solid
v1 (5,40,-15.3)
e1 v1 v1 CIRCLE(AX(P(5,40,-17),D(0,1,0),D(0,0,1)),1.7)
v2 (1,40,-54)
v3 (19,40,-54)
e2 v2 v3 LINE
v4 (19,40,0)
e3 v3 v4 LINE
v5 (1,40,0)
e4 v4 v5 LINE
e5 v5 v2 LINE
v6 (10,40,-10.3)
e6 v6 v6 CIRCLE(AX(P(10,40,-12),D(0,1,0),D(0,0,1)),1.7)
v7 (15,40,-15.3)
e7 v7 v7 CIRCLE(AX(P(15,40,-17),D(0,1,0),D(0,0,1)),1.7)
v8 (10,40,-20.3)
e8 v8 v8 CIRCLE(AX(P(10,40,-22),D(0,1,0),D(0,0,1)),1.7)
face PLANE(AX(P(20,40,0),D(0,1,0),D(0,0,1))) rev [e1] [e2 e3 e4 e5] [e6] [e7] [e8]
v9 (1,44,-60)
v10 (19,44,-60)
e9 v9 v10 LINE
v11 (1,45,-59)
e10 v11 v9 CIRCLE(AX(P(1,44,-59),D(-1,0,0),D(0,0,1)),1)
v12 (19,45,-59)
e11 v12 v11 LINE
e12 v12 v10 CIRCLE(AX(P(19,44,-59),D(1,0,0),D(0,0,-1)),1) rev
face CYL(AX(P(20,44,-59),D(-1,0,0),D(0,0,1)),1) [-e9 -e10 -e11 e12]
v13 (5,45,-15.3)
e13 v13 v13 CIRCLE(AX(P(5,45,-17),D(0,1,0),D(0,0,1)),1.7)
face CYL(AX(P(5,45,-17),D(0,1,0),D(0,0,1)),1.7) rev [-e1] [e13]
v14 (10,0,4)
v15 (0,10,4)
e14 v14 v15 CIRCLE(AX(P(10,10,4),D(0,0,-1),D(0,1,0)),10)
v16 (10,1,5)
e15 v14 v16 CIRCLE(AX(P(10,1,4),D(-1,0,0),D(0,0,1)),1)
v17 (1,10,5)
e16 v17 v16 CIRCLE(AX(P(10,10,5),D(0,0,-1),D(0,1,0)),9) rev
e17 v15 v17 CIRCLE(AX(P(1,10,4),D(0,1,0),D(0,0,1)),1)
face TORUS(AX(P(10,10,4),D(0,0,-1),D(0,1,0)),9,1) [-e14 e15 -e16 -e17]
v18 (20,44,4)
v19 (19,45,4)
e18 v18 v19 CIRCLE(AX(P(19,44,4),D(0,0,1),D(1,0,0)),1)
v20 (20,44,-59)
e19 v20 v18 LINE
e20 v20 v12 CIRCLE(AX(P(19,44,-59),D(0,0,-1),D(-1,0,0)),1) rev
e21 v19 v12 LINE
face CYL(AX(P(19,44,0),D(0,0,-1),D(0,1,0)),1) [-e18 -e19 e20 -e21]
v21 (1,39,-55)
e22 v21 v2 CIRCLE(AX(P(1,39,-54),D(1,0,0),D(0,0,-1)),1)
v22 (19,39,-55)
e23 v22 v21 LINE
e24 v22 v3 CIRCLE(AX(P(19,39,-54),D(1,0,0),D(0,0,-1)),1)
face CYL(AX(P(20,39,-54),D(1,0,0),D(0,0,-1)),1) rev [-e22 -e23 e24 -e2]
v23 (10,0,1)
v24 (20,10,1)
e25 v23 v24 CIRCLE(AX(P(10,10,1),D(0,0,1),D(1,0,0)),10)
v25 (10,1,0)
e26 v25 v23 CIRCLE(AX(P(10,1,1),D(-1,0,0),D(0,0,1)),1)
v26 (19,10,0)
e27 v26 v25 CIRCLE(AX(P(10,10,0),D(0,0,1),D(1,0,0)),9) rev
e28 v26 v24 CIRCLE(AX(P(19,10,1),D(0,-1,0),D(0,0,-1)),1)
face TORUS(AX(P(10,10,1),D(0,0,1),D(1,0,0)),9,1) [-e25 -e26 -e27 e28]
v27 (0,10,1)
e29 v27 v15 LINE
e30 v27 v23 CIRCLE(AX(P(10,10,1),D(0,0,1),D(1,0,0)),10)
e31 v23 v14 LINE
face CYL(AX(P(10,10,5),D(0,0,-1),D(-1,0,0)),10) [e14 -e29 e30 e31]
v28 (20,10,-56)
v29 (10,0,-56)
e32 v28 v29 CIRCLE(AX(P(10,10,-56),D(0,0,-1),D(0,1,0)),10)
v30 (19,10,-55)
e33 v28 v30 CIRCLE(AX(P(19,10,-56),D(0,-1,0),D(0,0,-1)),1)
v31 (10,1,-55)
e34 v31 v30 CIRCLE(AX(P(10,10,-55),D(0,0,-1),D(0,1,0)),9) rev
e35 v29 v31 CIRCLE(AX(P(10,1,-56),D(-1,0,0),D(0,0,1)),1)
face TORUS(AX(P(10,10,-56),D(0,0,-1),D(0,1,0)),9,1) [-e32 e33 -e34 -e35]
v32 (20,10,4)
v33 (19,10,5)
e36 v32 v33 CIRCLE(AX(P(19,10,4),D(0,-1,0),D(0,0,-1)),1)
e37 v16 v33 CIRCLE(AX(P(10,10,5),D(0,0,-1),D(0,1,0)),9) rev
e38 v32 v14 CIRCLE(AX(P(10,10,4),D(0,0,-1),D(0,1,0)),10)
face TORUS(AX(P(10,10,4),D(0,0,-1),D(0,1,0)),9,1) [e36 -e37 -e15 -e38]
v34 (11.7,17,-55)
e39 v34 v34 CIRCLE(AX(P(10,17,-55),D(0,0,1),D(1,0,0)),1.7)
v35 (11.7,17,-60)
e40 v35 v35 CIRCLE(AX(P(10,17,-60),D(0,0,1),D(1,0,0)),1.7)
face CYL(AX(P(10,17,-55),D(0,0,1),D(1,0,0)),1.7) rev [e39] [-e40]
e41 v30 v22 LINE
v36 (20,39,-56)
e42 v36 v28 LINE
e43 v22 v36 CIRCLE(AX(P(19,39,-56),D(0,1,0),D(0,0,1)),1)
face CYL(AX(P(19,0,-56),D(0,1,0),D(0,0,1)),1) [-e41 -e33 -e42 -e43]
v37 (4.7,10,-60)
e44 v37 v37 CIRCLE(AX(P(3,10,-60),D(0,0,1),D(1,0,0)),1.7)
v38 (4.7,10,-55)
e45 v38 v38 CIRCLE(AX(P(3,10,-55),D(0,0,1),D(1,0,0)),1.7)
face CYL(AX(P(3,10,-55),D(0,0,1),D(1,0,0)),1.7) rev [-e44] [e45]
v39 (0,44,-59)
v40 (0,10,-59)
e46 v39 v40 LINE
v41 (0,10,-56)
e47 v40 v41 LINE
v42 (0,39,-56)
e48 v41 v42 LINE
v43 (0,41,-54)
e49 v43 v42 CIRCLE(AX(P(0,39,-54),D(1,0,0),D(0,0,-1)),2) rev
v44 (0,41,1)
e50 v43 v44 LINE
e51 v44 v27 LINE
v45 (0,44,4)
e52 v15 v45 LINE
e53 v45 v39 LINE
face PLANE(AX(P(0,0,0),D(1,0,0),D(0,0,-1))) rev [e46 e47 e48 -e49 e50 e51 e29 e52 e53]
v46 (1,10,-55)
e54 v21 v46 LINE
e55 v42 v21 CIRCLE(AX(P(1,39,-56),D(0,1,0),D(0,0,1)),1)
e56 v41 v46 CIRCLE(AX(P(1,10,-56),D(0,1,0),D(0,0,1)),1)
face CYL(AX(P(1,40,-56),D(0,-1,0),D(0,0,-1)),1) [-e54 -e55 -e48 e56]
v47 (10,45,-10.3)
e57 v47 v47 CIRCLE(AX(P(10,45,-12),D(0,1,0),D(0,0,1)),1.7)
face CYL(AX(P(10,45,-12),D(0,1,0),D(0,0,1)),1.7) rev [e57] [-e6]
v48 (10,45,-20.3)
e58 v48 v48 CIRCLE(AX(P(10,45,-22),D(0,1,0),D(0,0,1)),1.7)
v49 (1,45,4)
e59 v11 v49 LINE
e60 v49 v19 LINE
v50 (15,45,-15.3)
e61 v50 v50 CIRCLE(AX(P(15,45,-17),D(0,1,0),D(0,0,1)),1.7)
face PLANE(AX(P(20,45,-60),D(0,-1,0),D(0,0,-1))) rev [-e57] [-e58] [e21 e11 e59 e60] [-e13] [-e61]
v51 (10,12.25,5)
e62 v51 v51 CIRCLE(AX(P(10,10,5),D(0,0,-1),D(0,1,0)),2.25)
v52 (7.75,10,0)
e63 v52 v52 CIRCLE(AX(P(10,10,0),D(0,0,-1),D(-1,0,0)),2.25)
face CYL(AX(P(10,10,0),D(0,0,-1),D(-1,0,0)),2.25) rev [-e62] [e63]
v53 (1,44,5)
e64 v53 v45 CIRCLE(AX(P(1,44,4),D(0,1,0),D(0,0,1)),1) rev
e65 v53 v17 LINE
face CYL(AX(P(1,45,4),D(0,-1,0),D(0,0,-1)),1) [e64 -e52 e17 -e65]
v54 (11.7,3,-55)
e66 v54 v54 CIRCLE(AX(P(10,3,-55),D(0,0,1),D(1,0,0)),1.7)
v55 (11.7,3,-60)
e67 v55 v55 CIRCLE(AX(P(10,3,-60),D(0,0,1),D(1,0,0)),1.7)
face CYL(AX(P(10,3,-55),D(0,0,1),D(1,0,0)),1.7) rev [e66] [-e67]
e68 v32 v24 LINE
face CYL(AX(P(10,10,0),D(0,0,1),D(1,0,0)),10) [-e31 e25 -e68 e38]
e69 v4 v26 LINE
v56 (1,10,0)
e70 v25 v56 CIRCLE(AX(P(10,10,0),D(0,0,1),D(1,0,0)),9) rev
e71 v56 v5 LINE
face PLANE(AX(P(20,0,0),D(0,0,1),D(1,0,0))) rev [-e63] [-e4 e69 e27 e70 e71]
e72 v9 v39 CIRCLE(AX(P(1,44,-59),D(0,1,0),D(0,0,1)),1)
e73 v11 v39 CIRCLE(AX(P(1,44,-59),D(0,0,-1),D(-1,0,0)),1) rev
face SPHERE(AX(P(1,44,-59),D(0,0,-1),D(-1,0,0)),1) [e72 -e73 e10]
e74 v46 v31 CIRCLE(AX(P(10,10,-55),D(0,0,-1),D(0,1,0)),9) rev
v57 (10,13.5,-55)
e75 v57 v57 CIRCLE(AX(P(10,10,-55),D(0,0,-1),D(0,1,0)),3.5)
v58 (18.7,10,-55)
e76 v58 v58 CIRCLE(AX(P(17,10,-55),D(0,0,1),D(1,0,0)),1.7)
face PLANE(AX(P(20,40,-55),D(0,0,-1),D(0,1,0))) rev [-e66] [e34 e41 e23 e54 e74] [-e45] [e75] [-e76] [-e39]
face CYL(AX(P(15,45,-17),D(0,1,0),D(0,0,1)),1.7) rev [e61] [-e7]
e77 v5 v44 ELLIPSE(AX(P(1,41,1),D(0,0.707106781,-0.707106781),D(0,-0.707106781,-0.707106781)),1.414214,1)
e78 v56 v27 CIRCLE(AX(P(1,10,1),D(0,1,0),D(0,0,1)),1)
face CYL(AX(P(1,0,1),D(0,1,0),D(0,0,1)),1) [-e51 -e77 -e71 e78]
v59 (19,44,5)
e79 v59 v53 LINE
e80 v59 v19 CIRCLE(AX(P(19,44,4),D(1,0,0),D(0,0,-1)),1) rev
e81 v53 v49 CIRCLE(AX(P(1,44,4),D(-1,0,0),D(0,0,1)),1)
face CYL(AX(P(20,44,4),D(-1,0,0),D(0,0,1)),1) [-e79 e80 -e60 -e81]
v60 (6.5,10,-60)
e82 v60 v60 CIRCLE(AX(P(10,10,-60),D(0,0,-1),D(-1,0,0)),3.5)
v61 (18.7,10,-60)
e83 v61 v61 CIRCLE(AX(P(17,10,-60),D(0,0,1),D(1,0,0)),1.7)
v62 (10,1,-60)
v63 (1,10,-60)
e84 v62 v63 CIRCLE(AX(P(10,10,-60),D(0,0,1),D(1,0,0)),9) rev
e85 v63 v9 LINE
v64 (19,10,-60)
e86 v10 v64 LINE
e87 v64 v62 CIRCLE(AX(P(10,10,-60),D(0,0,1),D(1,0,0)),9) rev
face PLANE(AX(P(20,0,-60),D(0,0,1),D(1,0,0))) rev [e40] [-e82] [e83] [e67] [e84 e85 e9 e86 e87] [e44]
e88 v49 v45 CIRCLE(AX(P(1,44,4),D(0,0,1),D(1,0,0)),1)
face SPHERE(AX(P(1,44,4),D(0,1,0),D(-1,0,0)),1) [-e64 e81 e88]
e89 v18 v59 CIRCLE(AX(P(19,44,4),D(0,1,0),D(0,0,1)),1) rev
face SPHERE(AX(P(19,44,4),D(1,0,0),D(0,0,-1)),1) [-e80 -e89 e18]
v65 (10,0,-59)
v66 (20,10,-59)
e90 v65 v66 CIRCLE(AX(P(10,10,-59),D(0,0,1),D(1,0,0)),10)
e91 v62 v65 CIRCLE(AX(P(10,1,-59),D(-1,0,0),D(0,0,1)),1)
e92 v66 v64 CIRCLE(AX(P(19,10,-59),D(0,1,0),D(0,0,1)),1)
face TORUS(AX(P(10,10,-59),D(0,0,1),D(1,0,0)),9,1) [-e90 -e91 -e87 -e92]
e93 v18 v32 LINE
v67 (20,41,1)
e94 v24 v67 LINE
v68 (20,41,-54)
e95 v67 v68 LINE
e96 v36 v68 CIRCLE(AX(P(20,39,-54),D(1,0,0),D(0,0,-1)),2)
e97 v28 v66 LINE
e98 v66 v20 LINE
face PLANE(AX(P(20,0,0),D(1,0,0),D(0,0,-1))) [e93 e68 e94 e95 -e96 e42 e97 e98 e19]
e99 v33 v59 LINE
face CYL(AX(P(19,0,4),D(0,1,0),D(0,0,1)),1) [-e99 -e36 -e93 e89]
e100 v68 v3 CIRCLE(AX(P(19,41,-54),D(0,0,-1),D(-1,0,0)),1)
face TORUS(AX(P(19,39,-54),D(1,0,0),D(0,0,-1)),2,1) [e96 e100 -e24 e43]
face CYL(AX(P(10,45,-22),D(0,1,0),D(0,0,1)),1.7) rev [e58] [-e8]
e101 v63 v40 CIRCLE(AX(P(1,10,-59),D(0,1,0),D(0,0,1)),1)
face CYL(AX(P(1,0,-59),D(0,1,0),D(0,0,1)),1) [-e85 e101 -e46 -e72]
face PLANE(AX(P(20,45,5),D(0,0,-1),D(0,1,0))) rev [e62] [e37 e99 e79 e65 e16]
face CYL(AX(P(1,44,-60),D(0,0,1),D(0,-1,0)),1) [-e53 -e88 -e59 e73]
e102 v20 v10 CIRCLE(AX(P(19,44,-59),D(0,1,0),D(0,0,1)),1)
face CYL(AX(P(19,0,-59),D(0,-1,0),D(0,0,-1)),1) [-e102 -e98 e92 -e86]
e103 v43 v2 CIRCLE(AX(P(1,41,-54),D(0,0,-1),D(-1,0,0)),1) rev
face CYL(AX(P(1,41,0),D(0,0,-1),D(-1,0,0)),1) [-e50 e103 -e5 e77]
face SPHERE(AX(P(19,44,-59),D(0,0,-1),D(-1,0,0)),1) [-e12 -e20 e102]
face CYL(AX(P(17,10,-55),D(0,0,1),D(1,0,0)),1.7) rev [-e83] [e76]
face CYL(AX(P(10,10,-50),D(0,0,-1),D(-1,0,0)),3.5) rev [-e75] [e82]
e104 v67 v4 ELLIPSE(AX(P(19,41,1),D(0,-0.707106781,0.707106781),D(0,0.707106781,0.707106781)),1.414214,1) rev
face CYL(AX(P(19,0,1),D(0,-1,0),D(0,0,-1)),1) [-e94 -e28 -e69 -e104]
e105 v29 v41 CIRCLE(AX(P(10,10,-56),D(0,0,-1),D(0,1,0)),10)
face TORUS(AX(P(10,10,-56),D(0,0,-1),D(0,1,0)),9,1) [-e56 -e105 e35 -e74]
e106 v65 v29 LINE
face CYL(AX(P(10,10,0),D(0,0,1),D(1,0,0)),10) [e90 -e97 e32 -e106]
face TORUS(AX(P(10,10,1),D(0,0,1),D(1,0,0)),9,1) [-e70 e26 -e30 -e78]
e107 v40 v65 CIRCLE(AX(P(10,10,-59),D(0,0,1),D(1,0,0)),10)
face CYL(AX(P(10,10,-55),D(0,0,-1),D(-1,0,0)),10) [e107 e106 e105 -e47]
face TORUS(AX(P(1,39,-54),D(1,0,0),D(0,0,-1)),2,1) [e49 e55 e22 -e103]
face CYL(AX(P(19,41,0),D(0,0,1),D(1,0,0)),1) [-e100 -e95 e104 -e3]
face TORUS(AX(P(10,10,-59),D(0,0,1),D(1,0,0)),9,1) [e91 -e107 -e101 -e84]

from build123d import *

# Parameters (mm, degrees)
EXTRUDE_1_DEPTH        = 20
FILLET_1_R             = 10
HOLE_WIZARD_M3_1_D     = 3.4
HOLE_WIZARD_M3_1_DEPTH = 20
HOLE_WIZARD_M3_1_TIP   = 1.021463052
HOLE_WIZARD_M4_1_D     = 4.5
HOLE_WIZARD_M4_1_DEPTH = 20
HOLE_WIZARD_M4_1_TIP   = 1.351936393
HOLE_WIZARD_M3_2_D     = 3.4
FILLET_2_R             = 1
SKETCH_8_R             = 3.5
CUT_EXTRUDE_1_DEPTH    = 10


with BuildPart() as part:
    # 草图1 → 凸台-拉伸1 (new body)
    with BuildSketch(Plane(origin=(0, 0, 0), x_dir=(0, 0, -1), z_dir=(1, 0, 0))):
        Polygon((0, 0), (0, 40), (55, 40), (55, 0), (60, 0), (60, 45), (-5, 45), (-5, 0), align=None)
    extrude(amount=EXTRUDE_1_DEPTH)

    # 圆角1
    fillet_1_edges = [part.edges().sort_by_distance(p)[0] for p in [
        (0, 0, -57.5),
        (20, 0, -57.5),
        (0, 0, 2.5),
        (20, 0, 2.5),
    ]]
    fillet(fillet_1_edges, radius=FILLET_1_R - 0.0001)  # a hair under: the kernel refuses the full size

    # M3 间隙孔1
    with Locations(Plane.XY.offset(-55)):
        with Locations((10, 3), (10, 17), (3, 10), (17, 10)):
            Hole(HOLE_WIZARD_M3_1_D / 2, depth=HOLE_WIZARD_M3_1_DEPTH)
            with Locations((0, 0, -(HOLE_WIZARD_M3_1_DEPTH + HOLE_WIZARD_M3_1_TIP / 2))):  # 118° drill point
                Cone(0, HOLE_WIZARD_M3_1_D / 2, HOLE_WIZARD_M3_1_TIP, mode=Mode.SUBTRACT)

    # M4 间隙孔1
    with Locations(Plane(origin=(0, 0, 0), x_dir=(-1, 0, 0), z_dir=(0, 0, -1))):
        with Locations((-10, 10)):
            Hole(HOLE_WIZARD_M4_1_D / 2, depth=HOLE_WIZARD_M4_1_DEPTH)
            with Locations((0, 0, -(HOLE_WIZARD_M4_1_DEPTH + HOLE_WIZARD_M4_1_TIP / 2))):  # 118° drill point
                Cone(0, HOLE_WIZARD_M4_1_D / 2, HOLE_WIZARD_M4_1_TIP, mode=Mode.SUBTRACT)

    # M3 间隙孔2 (through all)
    with Locations(Plane(origin=(0, 45, 0), x_dir=(1, 0, 0), z_dir=(0, 1, 0))):
        with Locations((15, 17), (10, 22), (5, 17), (10, 12)):
            Hole(HOLE_WIZARD_M3_2_D / 2)

    # 圆角2
    fillet_2_edges = [part.edges().sort_by_distance(p)[0] for p in [
        (0, 24.99995, -55),
        (0, 40, -27.5),
        (20, 40, -27.5),
        (10, 45, 5),
        (10, 45, -60),
        (10, 40, -55),
        (20, 24.99995, -55),
        (0, 27.49995, -60),
        (20, 27.49995, -60),
        (17.071097101, 2.928902899, -60),
        (2.928902899, 2.928902899, -60),
        (0, 24.99995, 0),
        (20, 45, -27.5),
        (17.071097101, 2.928902899, -55),
        (2.928902899, 2.928902899, -55),
        (20, 24.99995, 0),
        (20, 27.49995, 5),
        (17.071097101, 2.928902899, 0),
        (2.928902899, 2.928902899, 0),
        (17.071097101, 2.928902899, 5),
        (2.928902899, 2.928902899, 5),
        (0, 27.49995, 5),
        (0, 45, -27.5),
    ]]
    fillet(fillet_2_edges, radius=FILLET_2_R)

    # 草图8 → 切除-拉伸1 (cut)
    with BuildSketch(Plane(origin=(0, 0, -60), x_dir=(-1, 0, 0), z_dir=(0, 0, -1))):
        with Locations((-10, 10)):
            Circle(SKETCH_8_R)
    extrude(amount=-CUT_EXTRUDE_1_DEPTH, mode=Mode.SUBTRACT)


solid = part.part
